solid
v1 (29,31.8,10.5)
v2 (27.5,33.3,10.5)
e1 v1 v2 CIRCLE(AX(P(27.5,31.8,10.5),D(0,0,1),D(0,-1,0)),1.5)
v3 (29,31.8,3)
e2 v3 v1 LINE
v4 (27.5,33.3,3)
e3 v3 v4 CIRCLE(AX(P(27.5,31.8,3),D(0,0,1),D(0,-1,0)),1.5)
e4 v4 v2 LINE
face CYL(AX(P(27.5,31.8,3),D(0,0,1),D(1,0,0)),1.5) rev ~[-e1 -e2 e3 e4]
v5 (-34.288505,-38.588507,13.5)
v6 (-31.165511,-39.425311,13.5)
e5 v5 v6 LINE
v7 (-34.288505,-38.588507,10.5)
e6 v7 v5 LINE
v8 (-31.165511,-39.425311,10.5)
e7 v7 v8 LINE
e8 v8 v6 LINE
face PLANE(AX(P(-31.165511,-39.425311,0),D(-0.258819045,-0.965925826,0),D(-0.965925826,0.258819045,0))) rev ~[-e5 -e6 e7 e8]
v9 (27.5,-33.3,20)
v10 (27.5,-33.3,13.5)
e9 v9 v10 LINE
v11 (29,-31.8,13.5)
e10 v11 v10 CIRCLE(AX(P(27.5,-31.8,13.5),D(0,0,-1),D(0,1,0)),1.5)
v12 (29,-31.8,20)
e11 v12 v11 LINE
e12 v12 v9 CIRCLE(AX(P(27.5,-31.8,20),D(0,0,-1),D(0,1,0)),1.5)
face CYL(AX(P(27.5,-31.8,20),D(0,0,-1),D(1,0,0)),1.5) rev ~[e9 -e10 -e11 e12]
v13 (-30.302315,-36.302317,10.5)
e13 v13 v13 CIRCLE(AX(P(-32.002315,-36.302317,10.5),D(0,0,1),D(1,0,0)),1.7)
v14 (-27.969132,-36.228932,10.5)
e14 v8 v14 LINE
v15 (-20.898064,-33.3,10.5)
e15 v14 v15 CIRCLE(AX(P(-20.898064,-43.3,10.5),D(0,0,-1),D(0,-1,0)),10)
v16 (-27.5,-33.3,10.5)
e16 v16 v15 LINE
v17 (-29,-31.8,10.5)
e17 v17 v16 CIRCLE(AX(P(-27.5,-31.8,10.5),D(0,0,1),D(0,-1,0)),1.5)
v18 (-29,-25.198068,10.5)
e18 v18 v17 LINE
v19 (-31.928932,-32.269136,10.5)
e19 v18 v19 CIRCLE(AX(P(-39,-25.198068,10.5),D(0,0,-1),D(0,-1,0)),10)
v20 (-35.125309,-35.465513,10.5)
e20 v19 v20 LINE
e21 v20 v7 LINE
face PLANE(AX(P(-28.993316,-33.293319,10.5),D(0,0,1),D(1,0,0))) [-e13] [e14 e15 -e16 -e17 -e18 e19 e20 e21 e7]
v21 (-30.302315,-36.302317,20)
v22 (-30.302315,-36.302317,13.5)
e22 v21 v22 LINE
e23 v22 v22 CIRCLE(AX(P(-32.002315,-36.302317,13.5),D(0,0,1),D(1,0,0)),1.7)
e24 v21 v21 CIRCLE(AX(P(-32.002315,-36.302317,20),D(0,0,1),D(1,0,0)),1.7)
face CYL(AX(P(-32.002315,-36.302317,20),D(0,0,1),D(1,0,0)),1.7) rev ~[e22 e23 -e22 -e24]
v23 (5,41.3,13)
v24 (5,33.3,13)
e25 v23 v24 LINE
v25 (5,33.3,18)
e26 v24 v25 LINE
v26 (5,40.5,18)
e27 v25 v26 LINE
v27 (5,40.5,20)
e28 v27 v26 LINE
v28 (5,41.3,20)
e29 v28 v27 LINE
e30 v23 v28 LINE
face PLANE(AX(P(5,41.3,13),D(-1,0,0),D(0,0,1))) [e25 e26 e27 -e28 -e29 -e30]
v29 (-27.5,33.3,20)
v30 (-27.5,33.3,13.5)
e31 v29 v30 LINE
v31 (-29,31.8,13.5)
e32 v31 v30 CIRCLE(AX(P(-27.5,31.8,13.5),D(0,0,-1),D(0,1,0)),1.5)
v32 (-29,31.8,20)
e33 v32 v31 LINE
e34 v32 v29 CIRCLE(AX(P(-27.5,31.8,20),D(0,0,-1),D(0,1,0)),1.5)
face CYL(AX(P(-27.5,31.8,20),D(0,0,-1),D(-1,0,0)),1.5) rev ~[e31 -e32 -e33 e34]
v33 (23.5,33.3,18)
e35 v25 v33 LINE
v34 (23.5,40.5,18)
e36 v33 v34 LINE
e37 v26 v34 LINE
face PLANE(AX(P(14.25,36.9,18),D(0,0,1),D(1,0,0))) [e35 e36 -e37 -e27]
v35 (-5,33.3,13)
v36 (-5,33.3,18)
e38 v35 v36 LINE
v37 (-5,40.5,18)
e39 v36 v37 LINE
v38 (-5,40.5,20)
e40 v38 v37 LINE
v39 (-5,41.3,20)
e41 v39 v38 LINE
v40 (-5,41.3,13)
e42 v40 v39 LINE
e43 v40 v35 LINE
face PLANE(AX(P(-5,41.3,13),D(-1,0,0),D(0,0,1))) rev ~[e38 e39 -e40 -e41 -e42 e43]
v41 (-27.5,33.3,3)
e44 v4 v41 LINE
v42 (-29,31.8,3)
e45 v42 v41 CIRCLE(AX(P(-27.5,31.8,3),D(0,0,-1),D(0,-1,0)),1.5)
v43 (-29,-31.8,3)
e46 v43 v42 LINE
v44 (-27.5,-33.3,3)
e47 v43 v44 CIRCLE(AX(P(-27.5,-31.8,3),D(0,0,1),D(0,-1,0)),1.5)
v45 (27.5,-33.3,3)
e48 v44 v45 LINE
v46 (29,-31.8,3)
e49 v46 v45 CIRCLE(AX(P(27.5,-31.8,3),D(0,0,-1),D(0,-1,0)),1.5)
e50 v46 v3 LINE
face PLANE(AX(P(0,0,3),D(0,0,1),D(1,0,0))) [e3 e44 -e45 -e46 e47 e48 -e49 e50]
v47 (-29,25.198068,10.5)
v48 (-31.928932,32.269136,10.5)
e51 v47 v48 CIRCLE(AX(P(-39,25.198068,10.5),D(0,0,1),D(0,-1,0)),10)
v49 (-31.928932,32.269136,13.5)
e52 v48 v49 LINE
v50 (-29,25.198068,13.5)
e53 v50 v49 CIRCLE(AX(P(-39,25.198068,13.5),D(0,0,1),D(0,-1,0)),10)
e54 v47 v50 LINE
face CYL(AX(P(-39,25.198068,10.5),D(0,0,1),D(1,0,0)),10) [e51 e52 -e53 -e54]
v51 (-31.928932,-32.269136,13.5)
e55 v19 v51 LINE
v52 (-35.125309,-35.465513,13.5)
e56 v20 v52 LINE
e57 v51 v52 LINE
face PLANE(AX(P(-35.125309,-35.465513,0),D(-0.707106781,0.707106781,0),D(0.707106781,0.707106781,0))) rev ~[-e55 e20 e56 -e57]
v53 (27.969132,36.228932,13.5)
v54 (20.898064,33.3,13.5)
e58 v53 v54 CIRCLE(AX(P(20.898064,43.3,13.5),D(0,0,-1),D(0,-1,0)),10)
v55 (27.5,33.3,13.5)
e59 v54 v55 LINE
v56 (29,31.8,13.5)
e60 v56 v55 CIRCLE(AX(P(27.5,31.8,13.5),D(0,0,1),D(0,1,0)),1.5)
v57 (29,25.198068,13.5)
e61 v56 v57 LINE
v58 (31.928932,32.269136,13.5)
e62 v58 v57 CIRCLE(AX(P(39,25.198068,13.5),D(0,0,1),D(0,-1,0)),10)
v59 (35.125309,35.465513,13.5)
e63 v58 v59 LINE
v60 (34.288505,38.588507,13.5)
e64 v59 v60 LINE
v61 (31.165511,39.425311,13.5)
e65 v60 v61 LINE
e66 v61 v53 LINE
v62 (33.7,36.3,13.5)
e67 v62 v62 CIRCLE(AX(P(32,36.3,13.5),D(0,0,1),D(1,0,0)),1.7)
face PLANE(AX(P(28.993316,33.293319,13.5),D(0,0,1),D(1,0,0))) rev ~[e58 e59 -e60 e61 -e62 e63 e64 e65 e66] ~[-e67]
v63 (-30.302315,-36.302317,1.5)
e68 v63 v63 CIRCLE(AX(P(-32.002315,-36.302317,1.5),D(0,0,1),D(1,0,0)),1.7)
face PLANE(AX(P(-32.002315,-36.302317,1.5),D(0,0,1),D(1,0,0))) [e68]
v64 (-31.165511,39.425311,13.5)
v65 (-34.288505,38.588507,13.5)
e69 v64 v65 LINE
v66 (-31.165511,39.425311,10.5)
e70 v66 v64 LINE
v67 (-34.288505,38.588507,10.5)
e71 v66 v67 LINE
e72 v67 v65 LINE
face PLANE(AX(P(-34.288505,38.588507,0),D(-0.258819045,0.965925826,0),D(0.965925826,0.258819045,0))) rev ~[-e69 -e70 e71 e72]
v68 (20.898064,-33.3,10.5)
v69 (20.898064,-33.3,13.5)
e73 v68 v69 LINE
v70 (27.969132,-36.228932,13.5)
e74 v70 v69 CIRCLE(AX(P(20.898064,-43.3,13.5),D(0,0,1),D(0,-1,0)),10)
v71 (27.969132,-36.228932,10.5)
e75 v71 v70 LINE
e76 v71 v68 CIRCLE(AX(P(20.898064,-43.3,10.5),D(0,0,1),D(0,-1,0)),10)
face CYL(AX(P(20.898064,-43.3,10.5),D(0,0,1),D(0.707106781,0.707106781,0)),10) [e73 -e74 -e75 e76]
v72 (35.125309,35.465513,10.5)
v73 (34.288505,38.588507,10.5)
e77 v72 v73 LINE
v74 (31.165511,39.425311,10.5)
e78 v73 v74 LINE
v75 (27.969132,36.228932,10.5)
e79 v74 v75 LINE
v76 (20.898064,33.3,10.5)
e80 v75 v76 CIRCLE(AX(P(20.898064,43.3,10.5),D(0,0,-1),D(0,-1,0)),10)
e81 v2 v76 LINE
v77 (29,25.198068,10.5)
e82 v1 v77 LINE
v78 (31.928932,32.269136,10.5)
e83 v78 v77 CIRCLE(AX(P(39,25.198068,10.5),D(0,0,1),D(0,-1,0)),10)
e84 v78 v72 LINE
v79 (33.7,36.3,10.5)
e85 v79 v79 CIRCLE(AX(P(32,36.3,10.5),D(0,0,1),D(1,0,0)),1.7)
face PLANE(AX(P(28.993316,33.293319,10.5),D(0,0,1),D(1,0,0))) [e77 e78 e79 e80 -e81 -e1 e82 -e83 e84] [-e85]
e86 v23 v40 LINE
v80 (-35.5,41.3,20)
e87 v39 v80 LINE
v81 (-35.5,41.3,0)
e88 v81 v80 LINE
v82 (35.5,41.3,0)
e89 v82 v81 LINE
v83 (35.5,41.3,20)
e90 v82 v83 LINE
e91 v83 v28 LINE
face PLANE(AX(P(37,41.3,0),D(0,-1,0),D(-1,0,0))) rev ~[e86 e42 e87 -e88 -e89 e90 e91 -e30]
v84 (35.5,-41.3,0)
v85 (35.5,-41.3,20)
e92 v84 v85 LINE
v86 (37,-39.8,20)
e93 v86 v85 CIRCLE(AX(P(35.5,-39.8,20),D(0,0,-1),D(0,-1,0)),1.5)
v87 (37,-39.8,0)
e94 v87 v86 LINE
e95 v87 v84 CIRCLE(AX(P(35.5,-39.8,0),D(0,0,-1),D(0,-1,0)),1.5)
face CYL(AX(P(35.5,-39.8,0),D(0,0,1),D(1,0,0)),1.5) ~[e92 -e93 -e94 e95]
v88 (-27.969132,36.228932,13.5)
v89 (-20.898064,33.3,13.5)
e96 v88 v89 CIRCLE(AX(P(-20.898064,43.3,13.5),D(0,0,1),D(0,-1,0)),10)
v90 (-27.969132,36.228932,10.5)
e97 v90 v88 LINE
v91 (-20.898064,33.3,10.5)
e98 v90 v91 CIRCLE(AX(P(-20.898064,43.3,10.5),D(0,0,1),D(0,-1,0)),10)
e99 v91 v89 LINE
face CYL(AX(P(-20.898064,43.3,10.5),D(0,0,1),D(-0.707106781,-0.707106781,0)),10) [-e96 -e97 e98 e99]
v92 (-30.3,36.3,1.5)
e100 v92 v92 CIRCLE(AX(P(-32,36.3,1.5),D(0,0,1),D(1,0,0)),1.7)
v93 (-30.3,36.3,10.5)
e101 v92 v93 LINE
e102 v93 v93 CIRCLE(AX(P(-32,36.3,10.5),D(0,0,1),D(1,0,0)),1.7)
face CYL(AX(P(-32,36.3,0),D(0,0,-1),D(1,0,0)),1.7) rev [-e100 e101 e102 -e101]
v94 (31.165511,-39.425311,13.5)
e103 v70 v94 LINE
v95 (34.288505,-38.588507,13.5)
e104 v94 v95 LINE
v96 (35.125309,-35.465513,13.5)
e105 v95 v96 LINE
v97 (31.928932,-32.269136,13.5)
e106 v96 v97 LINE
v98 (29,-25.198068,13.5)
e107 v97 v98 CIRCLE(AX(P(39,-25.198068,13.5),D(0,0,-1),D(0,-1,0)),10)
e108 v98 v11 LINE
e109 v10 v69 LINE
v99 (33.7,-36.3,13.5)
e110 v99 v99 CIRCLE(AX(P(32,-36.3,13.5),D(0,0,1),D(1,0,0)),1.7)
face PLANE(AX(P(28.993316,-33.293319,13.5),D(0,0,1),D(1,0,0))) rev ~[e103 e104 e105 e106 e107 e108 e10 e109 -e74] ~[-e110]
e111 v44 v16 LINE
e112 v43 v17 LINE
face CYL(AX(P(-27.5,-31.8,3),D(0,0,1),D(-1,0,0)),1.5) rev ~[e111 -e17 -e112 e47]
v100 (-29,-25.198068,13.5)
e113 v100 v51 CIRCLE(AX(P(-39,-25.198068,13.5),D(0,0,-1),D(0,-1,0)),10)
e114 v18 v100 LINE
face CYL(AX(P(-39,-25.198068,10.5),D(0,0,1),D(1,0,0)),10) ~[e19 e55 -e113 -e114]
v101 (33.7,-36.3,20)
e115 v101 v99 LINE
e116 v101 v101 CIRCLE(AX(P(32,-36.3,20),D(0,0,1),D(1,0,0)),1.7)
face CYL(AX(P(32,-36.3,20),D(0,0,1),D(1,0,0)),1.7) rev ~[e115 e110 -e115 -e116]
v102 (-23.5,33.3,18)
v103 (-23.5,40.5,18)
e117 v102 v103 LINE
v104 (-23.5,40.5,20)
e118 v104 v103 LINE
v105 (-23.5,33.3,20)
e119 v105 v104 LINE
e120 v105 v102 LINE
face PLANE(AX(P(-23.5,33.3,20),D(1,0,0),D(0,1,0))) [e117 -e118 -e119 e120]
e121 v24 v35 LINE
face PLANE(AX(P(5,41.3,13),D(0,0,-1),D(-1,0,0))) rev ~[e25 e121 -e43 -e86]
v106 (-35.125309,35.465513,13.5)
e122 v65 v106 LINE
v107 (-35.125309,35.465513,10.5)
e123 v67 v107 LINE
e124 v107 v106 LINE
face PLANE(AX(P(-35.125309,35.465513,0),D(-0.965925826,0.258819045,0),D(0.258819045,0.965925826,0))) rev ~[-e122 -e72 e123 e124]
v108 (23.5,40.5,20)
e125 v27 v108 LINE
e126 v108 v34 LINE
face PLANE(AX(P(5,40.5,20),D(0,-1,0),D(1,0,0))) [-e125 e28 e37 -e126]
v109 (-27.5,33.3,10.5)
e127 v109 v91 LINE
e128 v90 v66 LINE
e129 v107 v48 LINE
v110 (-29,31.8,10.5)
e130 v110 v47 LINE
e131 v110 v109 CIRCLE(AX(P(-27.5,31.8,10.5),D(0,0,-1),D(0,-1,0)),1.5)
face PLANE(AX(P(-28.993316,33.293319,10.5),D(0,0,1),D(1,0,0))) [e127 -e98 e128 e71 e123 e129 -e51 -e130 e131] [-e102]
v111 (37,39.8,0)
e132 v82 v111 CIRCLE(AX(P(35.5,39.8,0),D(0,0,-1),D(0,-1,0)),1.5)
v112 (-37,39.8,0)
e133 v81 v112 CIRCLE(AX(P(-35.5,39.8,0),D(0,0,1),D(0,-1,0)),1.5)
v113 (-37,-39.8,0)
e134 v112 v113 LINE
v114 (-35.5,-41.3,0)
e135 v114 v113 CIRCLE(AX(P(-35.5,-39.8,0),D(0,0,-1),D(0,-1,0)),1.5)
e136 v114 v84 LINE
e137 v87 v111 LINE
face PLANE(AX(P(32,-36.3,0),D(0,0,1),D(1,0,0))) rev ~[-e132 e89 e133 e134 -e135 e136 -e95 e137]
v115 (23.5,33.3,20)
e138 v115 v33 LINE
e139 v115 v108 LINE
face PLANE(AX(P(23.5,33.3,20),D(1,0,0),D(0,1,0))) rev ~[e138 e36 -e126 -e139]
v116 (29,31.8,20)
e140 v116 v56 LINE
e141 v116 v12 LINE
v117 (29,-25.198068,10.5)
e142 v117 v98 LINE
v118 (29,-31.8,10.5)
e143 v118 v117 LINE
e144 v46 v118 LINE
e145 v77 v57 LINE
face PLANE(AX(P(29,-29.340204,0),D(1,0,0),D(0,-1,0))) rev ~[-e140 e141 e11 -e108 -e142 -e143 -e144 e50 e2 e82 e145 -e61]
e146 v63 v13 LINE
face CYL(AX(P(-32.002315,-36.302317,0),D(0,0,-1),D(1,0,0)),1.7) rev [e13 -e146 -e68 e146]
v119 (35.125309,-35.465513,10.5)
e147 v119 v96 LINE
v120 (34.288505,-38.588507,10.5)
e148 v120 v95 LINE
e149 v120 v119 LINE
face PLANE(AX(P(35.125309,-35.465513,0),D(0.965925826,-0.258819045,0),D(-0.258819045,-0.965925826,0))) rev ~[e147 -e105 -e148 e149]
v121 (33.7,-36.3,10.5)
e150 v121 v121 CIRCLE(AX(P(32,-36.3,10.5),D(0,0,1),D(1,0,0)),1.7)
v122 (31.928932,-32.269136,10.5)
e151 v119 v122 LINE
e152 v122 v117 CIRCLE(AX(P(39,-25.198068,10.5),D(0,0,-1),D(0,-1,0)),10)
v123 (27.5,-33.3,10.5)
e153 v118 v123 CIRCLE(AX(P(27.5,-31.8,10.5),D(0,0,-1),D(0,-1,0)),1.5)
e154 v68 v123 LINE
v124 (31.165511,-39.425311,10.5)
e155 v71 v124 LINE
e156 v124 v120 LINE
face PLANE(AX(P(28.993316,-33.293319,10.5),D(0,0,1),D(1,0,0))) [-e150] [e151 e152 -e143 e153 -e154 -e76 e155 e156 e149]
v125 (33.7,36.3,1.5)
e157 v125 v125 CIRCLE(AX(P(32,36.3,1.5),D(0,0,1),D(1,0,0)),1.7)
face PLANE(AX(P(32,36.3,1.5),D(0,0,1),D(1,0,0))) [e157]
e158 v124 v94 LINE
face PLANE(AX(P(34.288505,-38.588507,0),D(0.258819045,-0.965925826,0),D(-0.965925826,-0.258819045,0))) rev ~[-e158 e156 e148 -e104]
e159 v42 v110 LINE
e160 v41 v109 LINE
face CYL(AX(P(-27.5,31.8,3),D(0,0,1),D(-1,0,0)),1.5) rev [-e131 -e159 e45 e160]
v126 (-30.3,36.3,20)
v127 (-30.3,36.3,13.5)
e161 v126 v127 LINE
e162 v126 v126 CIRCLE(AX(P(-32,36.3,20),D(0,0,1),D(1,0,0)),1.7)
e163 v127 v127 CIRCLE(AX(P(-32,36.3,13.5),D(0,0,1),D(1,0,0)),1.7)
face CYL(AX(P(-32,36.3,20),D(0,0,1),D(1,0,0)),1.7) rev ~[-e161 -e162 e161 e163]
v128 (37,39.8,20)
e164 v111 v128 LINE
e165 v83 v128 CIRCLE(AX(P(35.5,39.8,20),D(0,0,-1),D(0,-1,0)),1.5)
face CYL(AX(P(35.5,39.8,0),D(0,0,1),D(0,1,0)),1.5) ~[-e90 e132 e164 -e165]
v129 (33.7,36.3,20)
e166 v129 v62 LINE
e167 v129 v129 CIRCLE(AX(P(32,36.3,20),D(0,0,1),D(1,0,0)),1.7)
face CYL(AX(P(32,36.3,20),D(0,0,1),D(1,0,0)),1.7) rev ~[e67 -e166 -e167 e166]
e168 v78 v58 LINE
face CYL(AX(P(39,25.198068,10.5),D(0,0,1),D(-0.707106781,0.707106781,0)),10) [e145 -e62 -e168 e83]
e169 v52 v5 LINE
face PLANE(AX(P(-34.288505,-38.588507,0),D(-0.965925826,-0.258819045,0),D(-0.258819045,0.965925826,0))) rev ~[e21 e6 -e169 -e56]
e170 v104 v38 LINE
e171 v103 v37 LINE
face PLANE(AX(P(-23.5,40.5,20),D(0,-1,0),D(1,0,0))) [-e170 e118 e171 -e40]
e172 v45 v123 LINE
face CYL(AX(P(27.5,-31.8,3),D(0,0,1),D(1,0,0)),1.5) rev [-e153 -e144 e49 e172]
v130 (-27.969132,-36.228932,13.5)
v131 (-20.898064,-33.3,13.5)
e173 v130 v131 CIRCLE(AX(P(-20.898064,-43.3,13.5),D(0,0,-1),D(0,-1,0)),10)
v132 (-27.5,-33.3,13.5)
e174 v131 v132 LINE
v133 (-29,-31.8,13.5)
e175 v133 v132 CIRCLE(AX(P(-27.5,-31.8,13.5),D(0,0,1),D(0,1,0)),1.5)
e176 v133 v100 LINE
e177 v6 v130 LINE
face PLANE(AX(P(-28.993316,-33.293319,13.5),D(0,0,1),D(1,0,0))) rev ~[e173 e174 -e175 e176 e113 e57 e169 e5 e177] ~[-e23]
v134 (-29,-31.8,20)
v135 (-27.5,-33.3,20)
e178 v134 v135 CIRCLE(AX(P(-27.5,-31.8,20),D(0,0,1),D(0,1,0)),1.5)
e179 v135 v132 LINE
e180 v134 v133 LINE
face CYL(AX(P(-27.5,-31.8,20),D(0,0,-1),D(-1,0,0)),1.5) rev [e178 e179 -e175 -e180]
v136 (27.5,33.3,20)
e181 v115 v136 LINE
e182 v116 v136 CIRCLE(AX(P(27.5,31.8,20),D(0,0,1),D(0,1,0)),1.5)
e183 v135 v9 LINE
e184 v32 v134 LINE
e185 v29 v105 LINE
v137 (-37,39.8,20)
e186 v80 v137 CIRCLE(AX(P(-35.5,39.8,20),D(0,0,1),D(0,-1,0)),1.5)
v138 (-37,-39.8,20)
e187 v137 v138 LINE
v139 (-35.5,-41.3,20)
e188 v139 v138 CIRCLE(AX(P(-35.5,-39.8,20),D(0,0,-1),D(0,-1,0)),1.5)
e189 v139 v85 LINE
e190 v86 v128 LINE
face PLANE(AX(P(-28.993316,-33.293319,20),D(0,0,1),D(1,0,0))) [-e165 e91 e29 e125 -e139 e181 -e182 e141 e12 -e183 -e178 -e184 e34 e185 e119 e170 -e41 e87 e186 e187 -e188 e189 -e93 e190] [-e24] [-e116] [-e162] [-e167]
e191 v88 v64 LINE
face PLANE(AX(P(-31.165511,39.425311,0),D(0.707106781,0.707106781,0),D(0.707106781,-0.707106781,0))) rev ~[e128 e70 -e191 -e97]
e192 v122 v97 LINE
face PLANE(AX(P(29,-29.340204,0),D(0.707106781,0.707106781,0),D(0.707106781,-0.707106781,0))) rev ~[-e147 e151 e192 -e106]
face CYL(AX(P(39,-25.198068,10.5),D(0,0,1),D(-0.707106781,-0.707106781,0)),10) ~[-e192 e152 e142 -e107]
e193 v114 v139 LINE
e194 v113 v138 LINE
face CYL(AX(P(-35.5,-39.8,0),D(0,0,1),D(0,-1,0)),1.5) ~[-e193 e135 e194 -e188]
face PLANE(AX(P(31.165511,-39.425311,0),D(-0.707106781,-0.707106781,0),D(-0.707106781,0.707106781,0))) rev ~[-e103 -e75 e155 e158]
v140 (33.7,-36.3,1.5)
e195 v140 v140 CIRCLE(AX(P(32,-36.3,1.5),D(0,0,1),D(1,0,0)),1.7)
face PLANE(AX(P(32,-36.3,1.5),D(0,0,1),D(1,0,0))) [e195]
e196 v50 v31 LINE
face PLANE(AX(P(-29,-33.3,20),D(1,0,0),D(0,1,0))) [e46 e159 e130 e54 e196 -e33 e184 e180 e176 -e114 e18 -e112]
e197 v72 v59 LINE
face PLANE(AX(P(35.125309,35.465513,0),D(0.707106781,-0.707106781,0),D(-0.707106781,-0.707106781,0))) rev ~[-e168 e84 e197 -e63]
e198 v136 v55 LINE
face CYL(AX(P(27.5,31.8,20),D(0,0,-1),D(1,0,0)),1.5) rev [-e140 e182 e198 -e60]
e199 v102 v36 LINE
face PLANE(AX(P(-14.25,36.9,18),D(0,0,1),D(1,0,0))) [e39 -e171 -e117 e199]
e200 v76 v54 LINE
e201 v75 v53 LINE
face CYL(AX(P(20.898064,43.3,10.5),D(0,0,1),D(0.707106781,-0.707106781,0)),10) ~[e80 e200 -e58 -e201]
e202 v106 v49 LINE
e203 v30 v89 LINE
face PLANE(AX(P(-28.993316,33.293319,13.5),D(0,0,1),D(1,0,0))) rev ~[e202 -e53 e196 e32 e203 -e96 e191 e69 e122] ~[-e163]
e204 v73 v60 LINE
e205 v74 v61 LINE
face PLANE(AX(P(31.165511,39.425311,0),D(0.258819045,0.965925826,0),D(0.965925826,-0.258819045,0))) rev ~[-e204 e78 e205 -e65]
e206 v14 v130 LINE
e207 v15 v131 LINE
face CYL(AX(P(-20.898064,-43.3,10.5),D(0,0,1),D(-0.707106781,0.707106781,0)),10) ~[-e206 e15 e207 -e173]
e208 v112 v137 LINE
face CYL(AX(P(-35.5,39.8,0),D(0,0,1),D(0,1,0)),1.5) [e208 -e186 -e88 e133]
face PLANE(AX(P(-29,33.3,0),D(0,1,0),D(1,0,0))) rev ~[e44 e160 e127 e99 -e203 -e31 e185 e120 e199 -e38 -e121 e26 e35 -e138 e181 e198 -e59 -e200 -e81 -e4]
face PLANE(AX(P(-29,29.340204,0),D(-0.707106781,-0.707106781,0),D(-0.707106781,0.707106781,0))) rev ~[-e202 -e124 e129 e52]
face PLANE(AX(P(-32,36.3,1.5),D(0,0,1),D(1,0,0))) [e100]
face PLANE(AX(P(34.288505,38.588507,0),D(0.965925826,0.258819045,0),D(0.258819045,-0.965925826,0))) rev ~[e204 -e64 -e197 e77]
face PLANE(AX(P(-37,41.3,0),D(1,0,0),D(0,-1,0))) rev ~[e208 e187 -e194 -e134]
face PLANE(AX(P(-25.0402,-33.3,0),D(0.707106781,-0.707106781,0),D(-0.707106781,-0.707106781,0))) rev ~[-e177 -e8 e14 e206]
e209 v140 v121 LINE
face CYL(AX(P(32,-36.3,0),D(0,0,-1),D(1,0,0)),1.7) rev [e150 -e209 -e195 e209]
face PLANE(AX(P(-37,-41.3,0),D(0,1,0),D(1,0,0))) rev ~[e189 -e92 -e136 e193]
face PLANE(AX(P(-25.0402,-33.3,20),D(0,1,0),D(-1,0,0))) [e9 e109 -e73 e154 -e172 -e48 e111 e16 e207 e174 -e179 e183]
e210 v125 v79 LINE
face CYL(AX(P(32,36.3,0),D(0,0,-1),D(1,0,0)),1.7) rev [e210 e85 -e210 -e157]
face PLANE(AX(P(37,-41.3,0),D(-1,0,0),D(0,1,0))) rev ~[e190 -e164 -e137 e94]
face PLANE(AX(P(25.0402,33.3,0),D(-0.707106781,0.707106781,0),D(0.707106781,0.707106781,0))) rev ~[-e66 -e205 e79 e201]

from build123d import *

# Parameters (mm, degrees)
F1_DEPTH  = 20
F2_DEPTH  = 3
F0_R      = 1.7
F3_DEPTH  = 10.5
F4_R      = 1.7
F5_DEPTH  = 6.5
F6_R      = 10
F7_R      = 1.5
F8_DEPTH  = 1.5
F9_W      = 10
F9_H      = 7
F10_DEPTH = 10
F12_W     = 18.5
F12_H     = 7.2
F13_DEPTH = 2


with BuildPart() as f1:
    # F0 (on Top) → F1 (new body)
    with BuildSketch(Plane.XY):
        Polygon((-37, 31.3), (-37, -41.3), (37, -41.3), (37, 31.3), (37, 41.3), (-37, 41.3), align=None)
        Polygon((-28.8793207629, 37.1391206695), (-25.0402000934, 33.3), (25.0402000934, 33.3), (28.8793207629, 37.1391206695), (31.1655111895, 39.4253110961), (34.2885053902, 38.5885073221), (35.1253091642, 35.4655131215), (32.8391187376, 33.1793226949), (29, 29.3402039573), (29, -29.3402039573), (32.8391187376, -33.1793226949), (35.1253091642, -35.4655131215), (34.2885053902, -38.5885073221), (31.1655111895, -39.4253110961), (28.8793207629, -37.1391206695), (25.0402000934, -33.3), (-25.0402000934, -33.3), (-28.8793207629, -37.1391206695), (-31.1655111895, -39.4253110961), (-34.2885053902, -38.5885073221), (-35.1253091642, -35.4655131215), (-32.8391187376, -33.1793226949), (-29, -29.3402039573), (-29, 29.3402039573), (-32.8391187376, 33.1793226949), (-35.1253091642, 35.4655131215), (-34.2885053902, 38.5885073221), (-31.1655111895, 39.4253110961), align=None, mode=Mode.SUBTRACT)
    extrude(amount=F1_DEPTH)

    # F0 (on Top) → F2 (join)
    with BuildSketch(Plane.XY):
        Polygon((-25.0402000934, 33.3), (-29, 33.3), (-29, 29.3402039573), (-29, -29.3402039573), (-29, -33.3), (-25.0402000934, -33.3), (25.0402000934, -33.3), (29, -33.3), (29, -29.3402039573), (29, 29.3402039573), (29, 33.3), (25.0402000934, 33.3), align=None)
    extrude(amount=F2_DEPTH)

    # F0 (on Top) → F3 (join)
    with BuildSketch(Plane.XY):
        Polygon((-29, 29.3402039573), (-29, 33.3), (-25.0402000934, 33.3), (-28.8793207629, 37.1391206695), (-29.716124537, 34.0161264689), (-32.8391187376, 33.1793226949), align=None)
        Polygon((-29.716124537, 34.0161264689), (-28.8793207629, 37.1391206695), (-31.1655111895, 39.4253110961), (-34.2885053902, 38.5885073221), (-35.1253091642, 35.4655131215), (-32.8391187376, 33.1793226949), align=None)
        with Locations((-32, 36.3)):
            Circle(F0_R, mode=Mode.SUBTRACT)
        Polygon((28.8793207629, 37.1391206695), (25.0402000934, 33.3), (29, 33.3), (29, 29.3402039573), (32.8391187376, 33.1793226949), (29.716124537, 34.0161264689), align=None)
        Polygon((31.1655111895, 39.4253110961), (28.8793207629, 37.1391206695), (29.716124537, 34.0161264689), (32.8391187376, 33.1793226949), (35.1253091642, 35.4655131215), (34.2885053902, 38.5885073221), align=None)
        with Locations((32, 36.3)):
            Circle(F0_R, mode=Mode.SUBTRACT)
        Polygon((32.8391187376, -33.1793226949), (29, -29.3402039573), (29, -33.3), (25.0402000934, -33.3), (28.8793207629, -37.1391206695), (29.716124537, -34.0161264689), align=None)
        Polygon((-29, -33.3), (-29, -29.3402039573), (-32.8391187376, -33.1793226949), (-29.716124537, -34.0161264689), (-28.8793207629, -37.1391206695), (-25.0402000934, -33.3), align=None)
        Polygon((-29.716124537, -34.0161264689), (-32.8391187376, -33.1793226949), (-35.1253091642, -35.4655131215), (-34.2885053902, -38.5885073221), (-31.1655111895, -39.4253110961), (-28.8793207629, -37.1391206695), align=None)
        with Locations((-32.0023149636, -36.3023168955)):
            Circle(F0_R, mode=Mode.SUBTRACT)
        Polygon((35.1253091642, -35.4655131215), (32.8391187376, -33.1793226949), (29.716124537, -34.0161264689), (28.8793207629, -37.1391206695), (31.1655111895, -39.4253110961), (34.2885053902, -38.5885073221), align=None)
        with Locations((32, -36.3)):
            Circle(F0_R, mode=Mode.SUBTRACT)
    extrude(amount=F3_DEPTH)

    # F4 (on face) → F5 (join)
    with BuildSketch(Plane.XY.offset(20)):
        Polygon((-29, -29.3402039573), (-32.8391187376, -33.1793226949), (-29.716124537, -34.0161264689), (-28.8793207629, -37.1391206695), (-25.0402000934, -33.3), (-29, -33.3), align=None)
        Polygon((-29.716124537, -34.0161264689), (-32.8391187376, -33.1793226949), (-35.1253091642, -35.4655131215), (-34.2885053902, -38.5885073221), (-31.1655111895, -39.4253110961), (-28.8793207629, -37.1391206695), align=None)
        with Locations((-32.0023149636, -36.3023168955)):
            Circle(F4_R, mode=Mode.SUBTRACT)
        Polygon((29, -33.3), (25.0402000934, -33.3), (28.8793207629, -37.1391206695), (29.716124537, -34.0161264689), (32.8391187376, -33.1793226949), (29, -29.3402039573), align=None)
        Polygon((29.716124537, -34.0161264689), (28.8793207629, -37.1391206695), (31.1655111895, -39.4253110961), (34.2885053902, -38.5885073221), (35.1253091642, -35.4655131215), (32.8391187376, -33.1793226949), align=None)
        with Locations((32, -36.3)):
            Circle(F4_R, mode=Mode.SUBTRACT)
        Polygon((28.8793207629, 37.1391206695), (25.0402000934, 33.3), (29, 33.3), (29, 29.3402039573), (32.8391187376, 33.1793226949), (29.716124537, 34.0161264689), align=None)
        Polygon((31.1655111895, 39.4253110961), (28.8793207629, 37.1391206695), (29.716124537, 34.0161264689), (32.8391187376, 33.1793226949), (35.1253091642, 35.4655131215), (34.2885053902, 38.5885073221), align=None)
        with Locations((32, 36.3)):
            Circle(F4_R, mode=Mode.SUBTRACT)
        Polygon((-32.8391187376, 33.1793226949), (-29, 29.3402039573), (-29, 33.3), (-25.0402000934, 33.3), (-28.8793207629, 37.1391206695), (-29.716124537, 34.0161264689), align=None)
        Polygon((-35.1253091642, 35.4655131215), (-32.8391187376, 33.1793226949), (-29.716124537, 34.0161264689), (-28.8793207629, 37.1391206695), (-31.1655111895, 39.4253110961), (-34.2885053902, 38.5885073221), align=None)
        with Locations((-32, 36.3)):
            Circle(F4_R, mode=Mode.SUBTRACT)
    extrude(amount=-F5_DEPTH)

    # F6
    f6_edges = [f1.edges().sort_by_distance(p)[0] for p in [
        (29, 29.340204, 12),
        (25.0402, 33.3, 12),
        (29, -29.340204, 12),
        (25.0402, -33.3, 12),
        (-29, 29.340204, 12),
        (-25.0402, 33.3, 12),
        (-25.0402, -33.3, 12),
        (-29, -29.340204, 12),
    ]]
    fillet(f6_edges, radius=F6_R)

    # F7
    f7_edges = [f1.edges().sort_by_distance(p)[0] for p in [
        (-37, -41.3, 10),
        (37, -41.3, 10),
        (-37, 41.3, 10),
        (37, 41.3, 10),
        (-29, 33.3, 6.75),
        (-29, 33.3, 16.75),
        (29, 33.3, 6.75),
        (29, 33.3, 16.75),
        (-29, -33.3, 6.75),
        (-29, -33.3, 16.75),
        (29, -33.3, 6.75),
        (29, -33.3, 16.75),
    ]]
    fillet(f7_edges, radius=F7_R)

    # F0 (on Top) → F8 (join)
    with BuildSketch(Plane.XY):
        with Locations((32, -36.3)):
            Circle(F0_R)
        with Locations((32, 36.3)):
            Circle(F0_R)
        with Locations((-32.0023149636, -36.3023168955)):
            Circle(F0_R)
        with Locations((-32, 36.3)):
            Circle(F0_R)
    extrude(amount=F8_DEPTH)

    # F9 (on face) → F10 (cut)
    with BuildSketch(Plane(origin=(0, 41.3, 0), x_dir=(-1, 0, 0), z_dir=(0, 1, 0))):
        with Locations((0, 16.5)):
            Rectangle(F9_W, F9_H)
    extrude(amount=-F10_DEPTH, mode=Mode.SUBTRACT)

    # F12 (on face) → F13 (cut)
    with BuildSketch(Plane.XY.offset(20)):
        with Locations((-14.25, 36.9)):
            Rectangle(F12_W, F12_H)
        with Locations((14.25, 36.9)):
            Rectangle(F12_W, F12_H)
    extrude(amount=-F13_DEPTH, mode=Mode.SUBTRACT)


solid = f1.part
